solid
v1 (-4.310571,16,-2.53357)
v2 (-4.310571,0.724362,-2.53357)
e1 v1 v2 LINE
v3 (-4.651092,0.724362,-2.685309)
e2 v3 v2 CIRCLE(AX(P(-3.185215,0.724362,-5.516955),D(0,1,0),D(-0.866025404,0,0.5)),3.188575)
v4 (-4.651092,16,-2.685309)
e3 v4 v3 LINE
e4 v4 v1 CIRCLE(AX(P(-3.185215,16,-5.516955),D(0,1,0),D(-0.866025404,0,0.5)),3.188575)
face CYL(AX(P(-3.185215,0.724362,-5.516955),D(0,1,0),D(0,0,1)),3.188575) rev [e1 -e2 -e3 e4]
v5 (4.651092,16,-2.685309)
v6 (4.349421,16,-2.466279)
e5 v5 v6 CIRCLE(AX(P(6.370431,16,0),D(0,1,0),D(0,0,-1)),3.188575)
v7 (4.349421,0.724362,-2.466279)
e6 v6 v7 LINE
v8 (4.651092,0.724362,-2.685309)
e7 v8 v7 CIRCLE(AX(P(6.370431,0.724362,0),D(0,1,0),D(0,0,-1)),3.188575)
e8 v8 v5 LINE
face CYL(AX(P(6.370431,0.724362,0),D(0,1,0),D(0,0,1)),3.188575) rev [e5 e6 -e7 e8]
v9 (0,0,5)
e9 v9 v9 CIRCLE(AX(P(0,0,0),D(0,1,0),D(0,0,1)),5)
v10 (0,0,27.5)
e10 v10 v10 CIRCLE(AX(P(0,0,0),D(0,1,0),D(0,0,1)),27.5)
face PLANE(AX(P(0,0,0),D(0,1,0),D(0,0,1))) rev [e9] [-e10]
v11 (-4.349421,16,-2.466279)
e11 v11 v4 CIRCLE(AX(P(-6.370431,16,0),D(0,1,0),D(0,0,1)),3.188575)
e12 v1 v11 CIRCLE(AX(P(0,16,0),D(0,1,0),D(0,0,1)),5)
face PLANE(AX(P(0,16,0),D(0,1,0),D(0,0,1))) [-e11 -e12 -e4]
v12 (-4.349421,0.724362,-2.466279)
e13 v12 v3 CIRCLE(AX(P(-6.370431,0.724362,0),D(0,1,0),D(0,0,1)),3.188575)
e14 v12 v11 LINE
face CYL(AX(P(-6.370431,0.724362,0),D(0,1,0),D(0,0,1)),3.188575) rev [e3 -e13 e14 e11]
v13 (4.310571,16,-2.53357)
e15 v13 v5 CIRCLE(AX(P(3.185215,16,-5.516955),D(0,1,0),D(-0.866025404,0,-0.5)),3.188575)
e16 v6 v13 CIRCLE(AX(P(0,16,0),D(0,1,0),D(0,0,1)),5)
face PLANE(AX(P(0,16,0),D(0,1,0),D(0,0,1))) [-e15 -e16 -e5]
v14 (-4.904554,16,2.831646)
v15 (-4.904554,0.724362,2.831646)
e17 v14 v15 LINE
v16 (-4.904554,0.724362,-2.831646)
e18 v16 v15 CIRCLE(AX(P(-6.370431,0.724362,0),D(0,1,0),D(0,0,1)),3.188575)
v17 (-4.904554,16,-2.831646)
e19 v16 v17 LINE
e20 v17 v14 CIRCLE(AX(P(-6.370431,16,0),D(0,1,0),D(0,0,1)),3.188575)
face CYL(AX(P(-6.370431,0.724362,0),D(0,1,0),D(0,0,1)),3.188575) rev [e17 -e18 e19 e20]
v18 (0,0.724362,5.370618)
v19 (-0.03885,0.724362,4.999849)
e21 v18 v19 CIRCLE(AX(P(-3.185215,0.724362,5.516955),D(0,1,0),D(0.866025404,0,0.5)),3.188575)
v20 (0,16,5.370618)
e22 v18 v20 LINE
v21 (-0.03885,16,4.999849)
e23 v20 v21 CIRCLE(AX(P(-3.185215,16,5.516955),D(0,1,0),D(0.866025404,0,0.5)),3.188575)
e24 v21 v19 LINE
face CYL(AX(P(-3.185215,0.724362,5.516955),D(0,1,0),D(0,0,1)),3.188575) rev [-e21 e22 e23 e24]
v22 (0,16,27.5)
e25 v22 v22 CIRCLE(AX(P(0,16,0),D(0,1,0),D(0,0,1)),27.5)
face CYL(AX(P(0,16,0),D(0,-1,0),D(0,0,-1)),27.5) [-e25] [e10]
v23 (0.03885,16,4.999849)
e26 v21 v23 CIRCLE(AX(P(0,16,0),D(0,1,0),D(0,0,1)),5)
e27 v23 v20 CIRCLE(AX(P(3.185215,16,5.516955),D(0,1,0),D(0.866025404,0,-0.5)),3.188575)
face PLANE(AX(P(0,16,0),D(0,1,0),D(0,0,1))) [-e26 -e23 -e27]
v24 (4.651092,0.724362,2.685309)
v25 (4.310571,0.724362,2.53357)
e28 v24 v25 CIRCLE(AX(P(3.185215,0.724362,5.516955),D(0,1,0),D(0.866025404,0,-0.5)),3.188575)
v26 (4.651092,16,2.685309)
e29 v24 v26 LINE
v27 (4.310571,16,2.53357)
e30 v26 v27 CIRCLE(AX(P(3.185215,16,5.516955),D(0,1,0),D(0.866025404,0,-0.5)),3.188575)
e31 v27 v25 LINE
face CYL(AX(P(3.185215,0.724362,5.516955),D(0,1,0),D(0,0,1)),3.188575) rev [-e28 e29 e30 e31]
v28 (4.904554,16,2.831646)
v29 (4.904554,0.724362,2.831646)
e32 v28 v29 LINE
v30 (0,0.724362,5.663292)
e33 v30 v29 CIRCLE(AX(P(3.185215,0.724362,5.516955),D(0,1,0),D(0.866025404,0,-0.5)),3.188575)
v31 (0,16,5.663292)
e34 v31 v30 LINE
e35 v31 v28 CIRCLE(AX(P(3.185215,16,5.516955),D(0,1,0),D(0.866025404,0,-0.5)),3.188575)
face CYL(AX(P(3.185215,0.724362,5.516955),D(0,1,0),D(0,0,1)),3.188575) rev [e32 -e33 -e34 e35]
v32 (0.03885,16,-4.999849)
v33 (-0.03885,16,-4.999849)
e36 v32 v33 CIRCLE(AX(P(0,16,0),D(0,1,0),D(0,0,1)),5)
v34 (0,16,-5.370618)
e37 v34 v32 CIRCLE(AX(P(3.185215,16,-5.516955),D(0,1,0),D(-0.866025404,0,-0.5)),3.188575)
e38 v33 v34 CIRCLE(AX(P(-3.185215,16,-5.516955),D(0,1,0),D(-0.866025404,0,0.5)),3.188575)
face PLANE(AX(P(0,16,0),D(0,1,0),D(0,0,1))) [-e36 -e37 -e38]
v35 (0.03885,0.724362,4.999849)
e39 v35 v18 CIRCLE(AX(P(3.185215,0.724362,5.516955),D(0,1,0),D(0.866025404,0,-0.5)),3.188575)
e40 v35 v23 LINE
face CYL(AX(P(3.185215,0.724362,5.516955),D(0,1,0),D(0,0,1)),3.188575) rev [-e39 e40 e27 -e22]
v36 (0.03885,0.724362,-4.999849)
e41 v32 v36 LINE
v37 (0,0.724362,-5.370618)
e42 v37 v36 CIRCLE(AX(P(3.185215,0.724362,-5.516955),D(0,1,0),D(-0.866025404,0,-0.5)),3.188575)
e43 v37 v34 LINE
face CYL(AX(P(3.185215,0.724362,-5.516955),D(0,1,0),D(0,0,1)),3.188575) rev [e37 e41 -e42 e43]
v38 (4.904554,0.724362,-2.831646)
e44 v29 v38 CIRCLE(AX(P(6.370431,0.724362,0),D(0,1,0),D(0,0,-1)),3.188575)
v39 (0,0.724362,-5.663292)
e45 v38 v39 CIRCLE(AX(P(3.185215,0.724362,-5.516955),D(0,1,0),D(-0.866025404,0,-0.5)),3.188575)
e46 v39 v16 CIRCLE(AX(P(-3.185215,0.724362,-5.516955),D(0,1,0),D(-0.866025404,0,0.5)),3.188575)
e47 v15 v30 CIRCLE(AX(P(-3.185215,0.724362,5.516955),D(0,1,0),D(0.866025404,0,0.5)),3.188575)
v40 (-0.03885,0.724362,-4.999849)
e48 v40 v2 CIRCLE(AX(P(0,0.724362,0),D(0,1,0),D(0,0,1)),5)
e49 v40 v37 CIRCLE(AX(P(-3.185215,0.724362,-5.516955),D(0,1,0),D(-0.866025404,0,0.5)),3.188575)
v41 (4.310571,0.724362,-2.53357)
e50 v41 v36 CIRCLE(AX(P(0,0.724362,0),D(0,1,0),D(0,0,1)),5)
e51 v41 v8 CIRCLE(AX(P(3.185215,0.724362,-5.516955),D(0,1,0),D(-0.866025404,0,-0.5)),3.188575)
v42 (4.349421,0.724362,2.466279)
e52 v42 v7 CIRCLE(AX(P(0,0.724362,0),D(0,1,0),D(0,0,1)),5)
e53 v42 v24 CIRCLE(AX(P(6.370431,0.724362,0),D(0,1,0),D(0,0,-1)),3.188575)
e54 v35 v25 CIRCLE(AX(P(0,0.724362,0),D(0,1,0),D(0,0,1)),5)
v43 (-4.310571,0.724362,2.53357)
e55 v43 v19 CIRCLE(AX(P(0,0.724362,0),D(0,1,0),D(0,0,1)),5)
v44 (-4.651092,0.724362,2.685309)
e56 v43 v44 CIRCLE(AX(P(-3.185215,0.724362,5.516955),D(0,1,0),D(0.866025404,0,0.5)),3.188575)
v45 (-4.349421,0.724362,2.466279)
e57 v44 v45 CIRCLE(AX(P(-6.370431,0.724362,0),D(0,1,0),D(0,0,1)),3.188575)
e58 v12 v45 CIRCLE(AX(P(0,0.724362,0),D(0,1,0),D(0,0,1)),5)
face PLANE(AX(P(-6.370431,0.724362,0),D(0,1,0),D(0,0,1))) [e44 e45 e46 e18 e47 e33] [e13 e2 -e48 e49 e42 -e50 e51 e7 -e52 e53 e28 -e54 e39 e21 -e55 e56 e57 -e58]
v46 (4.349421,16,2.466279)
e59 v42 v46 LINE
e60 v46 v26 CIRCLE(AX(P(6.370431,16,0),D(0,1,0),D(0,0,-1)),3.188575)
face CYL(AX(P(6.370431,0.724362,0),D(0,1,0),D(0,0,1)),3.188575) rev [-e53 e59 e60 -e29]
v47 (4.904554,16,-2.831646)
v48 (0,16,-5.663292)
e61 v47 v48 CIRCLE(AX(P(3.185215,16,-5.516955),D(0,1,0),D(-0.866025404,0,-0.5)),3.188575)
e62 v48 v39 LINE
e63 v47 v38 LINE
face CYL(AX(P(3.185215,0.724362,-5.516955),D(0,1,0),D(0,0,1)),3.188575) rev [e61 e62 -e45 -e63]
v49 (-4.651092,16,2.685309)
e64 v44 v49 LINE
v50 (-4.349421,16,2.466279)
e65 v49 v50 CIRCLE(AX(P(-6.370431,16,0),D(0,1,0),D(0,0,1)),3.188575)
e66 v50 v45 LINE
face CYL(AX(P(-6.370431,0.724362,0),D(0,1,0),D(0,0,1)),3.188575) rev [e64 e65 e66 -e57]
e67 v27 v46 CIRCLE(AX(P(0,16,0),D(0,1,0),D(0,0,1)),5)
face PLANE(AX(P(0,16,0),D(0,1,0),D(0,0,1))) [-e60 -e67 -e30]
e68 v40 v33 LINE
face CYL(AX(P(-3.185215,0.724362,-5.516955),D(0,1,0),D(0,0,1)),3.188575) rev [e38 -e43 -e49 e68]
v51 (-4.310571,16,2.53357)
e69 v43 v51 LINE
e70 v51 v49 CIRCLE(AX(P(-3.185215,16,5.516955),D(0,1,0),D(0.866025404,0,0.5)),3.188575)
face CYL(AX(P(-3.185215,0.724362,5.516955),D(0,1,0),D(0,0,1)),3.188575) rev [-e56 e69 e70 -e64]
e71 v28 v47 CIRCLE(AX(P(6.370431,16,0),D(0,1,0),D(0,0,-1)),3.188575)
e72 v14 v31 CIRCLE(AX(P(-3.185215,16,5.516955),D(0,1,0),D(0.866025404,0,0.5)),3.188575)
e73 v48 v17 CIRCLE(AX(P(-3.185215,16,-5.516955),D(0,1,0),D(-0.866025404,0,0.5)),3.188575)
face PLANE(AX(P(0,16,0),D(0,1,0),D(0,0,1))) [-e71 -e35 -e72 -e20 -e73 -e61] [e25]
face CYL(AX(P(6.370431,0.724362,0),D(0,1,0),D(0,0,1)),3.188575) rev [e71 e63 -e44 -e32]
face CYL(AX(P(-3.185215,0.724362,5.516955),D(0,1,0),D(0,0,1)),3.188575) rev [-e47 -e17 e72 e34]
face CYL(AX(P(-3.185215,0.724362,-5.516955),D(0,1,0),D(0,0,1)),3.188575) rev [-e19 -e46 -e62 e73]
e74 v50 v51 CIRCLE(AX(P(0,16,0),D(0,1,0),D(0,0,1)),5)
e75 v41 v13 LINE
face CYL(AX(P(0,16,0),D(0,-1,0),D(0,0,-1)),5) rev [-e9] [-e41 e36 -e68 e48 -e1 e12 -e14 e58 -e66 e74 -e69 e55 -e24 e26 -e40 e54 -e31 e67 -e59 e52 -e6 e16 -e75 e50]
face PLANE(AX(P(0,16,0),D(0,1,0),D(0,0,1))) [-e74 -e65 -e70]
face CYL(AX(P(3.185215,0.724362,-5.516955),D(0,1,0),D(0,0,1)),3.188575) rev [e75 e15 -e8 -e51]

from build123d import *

# Parameters (mm, degrees)
SKETCH1_R           = 27.5
BOSS_EXTRUDE1_DEPTH = 16
SKETCH2_R           = 5
CUT_EXTRUDE1_DEPTH  = 43.053537307
SKETCH3_R           = 3.188575247
CUT_EXTRUDE2_DEPTH  = 15.2756379
CIRPATTERN1_COUNT   = 6


with BuildPart() as part:
    # Sketch1 → Boss-Extrude1 (new body)
    with BuildSketch(Plane(origin=(0, 0, 0), x_dir=(1, 0, 0), z_dir=(0, 1, 0))):
        Circle(SKETCH1_R)
    extrude(amount=BOSS_EXTRUDE1_DEPTH)

    # Sketch2 → Cut-Extrude1 (cut, through all)
    with BuildSketch(Plane(origin=(0, 0, 0), x_dir=(1, 0, 0), z_dir=(0, 1, 0))):
        Circle(SKETCH2_R)
    extrude(amount=CUT_EXTRUDE1_DEPTH, mode=Mode.SUBTRACT)

    # Sketch3 → Cut-Extrude2 (cut)
    with BuildSketch(Plane(origin=(0, 16, 0), x_dir=(1, 0, 0), z_dir=(0, 1, 0))):
        with Locations((-6.370430977, 0)):
            Circle(SKETCH3_R)
    cut_extrude2 = extrude(amount=-CUT_EXTRUDE2_DEPTH, mode=Mode.SUBTRACT)

    # CirPattern1: Cut-Extrude2 ×6 about axis
    cirpattern1_axis = Axis((0, 0, 0), (0, 1, 0))
    for i in range(1, CIRPATTERN1_COUNT):
        add(cut_extrude2.rotate(cirpattern1_axis, i * 360 / CIRPATTERN1_COUNT), mode=Mode.SUBTRACT)


solid = part.part
